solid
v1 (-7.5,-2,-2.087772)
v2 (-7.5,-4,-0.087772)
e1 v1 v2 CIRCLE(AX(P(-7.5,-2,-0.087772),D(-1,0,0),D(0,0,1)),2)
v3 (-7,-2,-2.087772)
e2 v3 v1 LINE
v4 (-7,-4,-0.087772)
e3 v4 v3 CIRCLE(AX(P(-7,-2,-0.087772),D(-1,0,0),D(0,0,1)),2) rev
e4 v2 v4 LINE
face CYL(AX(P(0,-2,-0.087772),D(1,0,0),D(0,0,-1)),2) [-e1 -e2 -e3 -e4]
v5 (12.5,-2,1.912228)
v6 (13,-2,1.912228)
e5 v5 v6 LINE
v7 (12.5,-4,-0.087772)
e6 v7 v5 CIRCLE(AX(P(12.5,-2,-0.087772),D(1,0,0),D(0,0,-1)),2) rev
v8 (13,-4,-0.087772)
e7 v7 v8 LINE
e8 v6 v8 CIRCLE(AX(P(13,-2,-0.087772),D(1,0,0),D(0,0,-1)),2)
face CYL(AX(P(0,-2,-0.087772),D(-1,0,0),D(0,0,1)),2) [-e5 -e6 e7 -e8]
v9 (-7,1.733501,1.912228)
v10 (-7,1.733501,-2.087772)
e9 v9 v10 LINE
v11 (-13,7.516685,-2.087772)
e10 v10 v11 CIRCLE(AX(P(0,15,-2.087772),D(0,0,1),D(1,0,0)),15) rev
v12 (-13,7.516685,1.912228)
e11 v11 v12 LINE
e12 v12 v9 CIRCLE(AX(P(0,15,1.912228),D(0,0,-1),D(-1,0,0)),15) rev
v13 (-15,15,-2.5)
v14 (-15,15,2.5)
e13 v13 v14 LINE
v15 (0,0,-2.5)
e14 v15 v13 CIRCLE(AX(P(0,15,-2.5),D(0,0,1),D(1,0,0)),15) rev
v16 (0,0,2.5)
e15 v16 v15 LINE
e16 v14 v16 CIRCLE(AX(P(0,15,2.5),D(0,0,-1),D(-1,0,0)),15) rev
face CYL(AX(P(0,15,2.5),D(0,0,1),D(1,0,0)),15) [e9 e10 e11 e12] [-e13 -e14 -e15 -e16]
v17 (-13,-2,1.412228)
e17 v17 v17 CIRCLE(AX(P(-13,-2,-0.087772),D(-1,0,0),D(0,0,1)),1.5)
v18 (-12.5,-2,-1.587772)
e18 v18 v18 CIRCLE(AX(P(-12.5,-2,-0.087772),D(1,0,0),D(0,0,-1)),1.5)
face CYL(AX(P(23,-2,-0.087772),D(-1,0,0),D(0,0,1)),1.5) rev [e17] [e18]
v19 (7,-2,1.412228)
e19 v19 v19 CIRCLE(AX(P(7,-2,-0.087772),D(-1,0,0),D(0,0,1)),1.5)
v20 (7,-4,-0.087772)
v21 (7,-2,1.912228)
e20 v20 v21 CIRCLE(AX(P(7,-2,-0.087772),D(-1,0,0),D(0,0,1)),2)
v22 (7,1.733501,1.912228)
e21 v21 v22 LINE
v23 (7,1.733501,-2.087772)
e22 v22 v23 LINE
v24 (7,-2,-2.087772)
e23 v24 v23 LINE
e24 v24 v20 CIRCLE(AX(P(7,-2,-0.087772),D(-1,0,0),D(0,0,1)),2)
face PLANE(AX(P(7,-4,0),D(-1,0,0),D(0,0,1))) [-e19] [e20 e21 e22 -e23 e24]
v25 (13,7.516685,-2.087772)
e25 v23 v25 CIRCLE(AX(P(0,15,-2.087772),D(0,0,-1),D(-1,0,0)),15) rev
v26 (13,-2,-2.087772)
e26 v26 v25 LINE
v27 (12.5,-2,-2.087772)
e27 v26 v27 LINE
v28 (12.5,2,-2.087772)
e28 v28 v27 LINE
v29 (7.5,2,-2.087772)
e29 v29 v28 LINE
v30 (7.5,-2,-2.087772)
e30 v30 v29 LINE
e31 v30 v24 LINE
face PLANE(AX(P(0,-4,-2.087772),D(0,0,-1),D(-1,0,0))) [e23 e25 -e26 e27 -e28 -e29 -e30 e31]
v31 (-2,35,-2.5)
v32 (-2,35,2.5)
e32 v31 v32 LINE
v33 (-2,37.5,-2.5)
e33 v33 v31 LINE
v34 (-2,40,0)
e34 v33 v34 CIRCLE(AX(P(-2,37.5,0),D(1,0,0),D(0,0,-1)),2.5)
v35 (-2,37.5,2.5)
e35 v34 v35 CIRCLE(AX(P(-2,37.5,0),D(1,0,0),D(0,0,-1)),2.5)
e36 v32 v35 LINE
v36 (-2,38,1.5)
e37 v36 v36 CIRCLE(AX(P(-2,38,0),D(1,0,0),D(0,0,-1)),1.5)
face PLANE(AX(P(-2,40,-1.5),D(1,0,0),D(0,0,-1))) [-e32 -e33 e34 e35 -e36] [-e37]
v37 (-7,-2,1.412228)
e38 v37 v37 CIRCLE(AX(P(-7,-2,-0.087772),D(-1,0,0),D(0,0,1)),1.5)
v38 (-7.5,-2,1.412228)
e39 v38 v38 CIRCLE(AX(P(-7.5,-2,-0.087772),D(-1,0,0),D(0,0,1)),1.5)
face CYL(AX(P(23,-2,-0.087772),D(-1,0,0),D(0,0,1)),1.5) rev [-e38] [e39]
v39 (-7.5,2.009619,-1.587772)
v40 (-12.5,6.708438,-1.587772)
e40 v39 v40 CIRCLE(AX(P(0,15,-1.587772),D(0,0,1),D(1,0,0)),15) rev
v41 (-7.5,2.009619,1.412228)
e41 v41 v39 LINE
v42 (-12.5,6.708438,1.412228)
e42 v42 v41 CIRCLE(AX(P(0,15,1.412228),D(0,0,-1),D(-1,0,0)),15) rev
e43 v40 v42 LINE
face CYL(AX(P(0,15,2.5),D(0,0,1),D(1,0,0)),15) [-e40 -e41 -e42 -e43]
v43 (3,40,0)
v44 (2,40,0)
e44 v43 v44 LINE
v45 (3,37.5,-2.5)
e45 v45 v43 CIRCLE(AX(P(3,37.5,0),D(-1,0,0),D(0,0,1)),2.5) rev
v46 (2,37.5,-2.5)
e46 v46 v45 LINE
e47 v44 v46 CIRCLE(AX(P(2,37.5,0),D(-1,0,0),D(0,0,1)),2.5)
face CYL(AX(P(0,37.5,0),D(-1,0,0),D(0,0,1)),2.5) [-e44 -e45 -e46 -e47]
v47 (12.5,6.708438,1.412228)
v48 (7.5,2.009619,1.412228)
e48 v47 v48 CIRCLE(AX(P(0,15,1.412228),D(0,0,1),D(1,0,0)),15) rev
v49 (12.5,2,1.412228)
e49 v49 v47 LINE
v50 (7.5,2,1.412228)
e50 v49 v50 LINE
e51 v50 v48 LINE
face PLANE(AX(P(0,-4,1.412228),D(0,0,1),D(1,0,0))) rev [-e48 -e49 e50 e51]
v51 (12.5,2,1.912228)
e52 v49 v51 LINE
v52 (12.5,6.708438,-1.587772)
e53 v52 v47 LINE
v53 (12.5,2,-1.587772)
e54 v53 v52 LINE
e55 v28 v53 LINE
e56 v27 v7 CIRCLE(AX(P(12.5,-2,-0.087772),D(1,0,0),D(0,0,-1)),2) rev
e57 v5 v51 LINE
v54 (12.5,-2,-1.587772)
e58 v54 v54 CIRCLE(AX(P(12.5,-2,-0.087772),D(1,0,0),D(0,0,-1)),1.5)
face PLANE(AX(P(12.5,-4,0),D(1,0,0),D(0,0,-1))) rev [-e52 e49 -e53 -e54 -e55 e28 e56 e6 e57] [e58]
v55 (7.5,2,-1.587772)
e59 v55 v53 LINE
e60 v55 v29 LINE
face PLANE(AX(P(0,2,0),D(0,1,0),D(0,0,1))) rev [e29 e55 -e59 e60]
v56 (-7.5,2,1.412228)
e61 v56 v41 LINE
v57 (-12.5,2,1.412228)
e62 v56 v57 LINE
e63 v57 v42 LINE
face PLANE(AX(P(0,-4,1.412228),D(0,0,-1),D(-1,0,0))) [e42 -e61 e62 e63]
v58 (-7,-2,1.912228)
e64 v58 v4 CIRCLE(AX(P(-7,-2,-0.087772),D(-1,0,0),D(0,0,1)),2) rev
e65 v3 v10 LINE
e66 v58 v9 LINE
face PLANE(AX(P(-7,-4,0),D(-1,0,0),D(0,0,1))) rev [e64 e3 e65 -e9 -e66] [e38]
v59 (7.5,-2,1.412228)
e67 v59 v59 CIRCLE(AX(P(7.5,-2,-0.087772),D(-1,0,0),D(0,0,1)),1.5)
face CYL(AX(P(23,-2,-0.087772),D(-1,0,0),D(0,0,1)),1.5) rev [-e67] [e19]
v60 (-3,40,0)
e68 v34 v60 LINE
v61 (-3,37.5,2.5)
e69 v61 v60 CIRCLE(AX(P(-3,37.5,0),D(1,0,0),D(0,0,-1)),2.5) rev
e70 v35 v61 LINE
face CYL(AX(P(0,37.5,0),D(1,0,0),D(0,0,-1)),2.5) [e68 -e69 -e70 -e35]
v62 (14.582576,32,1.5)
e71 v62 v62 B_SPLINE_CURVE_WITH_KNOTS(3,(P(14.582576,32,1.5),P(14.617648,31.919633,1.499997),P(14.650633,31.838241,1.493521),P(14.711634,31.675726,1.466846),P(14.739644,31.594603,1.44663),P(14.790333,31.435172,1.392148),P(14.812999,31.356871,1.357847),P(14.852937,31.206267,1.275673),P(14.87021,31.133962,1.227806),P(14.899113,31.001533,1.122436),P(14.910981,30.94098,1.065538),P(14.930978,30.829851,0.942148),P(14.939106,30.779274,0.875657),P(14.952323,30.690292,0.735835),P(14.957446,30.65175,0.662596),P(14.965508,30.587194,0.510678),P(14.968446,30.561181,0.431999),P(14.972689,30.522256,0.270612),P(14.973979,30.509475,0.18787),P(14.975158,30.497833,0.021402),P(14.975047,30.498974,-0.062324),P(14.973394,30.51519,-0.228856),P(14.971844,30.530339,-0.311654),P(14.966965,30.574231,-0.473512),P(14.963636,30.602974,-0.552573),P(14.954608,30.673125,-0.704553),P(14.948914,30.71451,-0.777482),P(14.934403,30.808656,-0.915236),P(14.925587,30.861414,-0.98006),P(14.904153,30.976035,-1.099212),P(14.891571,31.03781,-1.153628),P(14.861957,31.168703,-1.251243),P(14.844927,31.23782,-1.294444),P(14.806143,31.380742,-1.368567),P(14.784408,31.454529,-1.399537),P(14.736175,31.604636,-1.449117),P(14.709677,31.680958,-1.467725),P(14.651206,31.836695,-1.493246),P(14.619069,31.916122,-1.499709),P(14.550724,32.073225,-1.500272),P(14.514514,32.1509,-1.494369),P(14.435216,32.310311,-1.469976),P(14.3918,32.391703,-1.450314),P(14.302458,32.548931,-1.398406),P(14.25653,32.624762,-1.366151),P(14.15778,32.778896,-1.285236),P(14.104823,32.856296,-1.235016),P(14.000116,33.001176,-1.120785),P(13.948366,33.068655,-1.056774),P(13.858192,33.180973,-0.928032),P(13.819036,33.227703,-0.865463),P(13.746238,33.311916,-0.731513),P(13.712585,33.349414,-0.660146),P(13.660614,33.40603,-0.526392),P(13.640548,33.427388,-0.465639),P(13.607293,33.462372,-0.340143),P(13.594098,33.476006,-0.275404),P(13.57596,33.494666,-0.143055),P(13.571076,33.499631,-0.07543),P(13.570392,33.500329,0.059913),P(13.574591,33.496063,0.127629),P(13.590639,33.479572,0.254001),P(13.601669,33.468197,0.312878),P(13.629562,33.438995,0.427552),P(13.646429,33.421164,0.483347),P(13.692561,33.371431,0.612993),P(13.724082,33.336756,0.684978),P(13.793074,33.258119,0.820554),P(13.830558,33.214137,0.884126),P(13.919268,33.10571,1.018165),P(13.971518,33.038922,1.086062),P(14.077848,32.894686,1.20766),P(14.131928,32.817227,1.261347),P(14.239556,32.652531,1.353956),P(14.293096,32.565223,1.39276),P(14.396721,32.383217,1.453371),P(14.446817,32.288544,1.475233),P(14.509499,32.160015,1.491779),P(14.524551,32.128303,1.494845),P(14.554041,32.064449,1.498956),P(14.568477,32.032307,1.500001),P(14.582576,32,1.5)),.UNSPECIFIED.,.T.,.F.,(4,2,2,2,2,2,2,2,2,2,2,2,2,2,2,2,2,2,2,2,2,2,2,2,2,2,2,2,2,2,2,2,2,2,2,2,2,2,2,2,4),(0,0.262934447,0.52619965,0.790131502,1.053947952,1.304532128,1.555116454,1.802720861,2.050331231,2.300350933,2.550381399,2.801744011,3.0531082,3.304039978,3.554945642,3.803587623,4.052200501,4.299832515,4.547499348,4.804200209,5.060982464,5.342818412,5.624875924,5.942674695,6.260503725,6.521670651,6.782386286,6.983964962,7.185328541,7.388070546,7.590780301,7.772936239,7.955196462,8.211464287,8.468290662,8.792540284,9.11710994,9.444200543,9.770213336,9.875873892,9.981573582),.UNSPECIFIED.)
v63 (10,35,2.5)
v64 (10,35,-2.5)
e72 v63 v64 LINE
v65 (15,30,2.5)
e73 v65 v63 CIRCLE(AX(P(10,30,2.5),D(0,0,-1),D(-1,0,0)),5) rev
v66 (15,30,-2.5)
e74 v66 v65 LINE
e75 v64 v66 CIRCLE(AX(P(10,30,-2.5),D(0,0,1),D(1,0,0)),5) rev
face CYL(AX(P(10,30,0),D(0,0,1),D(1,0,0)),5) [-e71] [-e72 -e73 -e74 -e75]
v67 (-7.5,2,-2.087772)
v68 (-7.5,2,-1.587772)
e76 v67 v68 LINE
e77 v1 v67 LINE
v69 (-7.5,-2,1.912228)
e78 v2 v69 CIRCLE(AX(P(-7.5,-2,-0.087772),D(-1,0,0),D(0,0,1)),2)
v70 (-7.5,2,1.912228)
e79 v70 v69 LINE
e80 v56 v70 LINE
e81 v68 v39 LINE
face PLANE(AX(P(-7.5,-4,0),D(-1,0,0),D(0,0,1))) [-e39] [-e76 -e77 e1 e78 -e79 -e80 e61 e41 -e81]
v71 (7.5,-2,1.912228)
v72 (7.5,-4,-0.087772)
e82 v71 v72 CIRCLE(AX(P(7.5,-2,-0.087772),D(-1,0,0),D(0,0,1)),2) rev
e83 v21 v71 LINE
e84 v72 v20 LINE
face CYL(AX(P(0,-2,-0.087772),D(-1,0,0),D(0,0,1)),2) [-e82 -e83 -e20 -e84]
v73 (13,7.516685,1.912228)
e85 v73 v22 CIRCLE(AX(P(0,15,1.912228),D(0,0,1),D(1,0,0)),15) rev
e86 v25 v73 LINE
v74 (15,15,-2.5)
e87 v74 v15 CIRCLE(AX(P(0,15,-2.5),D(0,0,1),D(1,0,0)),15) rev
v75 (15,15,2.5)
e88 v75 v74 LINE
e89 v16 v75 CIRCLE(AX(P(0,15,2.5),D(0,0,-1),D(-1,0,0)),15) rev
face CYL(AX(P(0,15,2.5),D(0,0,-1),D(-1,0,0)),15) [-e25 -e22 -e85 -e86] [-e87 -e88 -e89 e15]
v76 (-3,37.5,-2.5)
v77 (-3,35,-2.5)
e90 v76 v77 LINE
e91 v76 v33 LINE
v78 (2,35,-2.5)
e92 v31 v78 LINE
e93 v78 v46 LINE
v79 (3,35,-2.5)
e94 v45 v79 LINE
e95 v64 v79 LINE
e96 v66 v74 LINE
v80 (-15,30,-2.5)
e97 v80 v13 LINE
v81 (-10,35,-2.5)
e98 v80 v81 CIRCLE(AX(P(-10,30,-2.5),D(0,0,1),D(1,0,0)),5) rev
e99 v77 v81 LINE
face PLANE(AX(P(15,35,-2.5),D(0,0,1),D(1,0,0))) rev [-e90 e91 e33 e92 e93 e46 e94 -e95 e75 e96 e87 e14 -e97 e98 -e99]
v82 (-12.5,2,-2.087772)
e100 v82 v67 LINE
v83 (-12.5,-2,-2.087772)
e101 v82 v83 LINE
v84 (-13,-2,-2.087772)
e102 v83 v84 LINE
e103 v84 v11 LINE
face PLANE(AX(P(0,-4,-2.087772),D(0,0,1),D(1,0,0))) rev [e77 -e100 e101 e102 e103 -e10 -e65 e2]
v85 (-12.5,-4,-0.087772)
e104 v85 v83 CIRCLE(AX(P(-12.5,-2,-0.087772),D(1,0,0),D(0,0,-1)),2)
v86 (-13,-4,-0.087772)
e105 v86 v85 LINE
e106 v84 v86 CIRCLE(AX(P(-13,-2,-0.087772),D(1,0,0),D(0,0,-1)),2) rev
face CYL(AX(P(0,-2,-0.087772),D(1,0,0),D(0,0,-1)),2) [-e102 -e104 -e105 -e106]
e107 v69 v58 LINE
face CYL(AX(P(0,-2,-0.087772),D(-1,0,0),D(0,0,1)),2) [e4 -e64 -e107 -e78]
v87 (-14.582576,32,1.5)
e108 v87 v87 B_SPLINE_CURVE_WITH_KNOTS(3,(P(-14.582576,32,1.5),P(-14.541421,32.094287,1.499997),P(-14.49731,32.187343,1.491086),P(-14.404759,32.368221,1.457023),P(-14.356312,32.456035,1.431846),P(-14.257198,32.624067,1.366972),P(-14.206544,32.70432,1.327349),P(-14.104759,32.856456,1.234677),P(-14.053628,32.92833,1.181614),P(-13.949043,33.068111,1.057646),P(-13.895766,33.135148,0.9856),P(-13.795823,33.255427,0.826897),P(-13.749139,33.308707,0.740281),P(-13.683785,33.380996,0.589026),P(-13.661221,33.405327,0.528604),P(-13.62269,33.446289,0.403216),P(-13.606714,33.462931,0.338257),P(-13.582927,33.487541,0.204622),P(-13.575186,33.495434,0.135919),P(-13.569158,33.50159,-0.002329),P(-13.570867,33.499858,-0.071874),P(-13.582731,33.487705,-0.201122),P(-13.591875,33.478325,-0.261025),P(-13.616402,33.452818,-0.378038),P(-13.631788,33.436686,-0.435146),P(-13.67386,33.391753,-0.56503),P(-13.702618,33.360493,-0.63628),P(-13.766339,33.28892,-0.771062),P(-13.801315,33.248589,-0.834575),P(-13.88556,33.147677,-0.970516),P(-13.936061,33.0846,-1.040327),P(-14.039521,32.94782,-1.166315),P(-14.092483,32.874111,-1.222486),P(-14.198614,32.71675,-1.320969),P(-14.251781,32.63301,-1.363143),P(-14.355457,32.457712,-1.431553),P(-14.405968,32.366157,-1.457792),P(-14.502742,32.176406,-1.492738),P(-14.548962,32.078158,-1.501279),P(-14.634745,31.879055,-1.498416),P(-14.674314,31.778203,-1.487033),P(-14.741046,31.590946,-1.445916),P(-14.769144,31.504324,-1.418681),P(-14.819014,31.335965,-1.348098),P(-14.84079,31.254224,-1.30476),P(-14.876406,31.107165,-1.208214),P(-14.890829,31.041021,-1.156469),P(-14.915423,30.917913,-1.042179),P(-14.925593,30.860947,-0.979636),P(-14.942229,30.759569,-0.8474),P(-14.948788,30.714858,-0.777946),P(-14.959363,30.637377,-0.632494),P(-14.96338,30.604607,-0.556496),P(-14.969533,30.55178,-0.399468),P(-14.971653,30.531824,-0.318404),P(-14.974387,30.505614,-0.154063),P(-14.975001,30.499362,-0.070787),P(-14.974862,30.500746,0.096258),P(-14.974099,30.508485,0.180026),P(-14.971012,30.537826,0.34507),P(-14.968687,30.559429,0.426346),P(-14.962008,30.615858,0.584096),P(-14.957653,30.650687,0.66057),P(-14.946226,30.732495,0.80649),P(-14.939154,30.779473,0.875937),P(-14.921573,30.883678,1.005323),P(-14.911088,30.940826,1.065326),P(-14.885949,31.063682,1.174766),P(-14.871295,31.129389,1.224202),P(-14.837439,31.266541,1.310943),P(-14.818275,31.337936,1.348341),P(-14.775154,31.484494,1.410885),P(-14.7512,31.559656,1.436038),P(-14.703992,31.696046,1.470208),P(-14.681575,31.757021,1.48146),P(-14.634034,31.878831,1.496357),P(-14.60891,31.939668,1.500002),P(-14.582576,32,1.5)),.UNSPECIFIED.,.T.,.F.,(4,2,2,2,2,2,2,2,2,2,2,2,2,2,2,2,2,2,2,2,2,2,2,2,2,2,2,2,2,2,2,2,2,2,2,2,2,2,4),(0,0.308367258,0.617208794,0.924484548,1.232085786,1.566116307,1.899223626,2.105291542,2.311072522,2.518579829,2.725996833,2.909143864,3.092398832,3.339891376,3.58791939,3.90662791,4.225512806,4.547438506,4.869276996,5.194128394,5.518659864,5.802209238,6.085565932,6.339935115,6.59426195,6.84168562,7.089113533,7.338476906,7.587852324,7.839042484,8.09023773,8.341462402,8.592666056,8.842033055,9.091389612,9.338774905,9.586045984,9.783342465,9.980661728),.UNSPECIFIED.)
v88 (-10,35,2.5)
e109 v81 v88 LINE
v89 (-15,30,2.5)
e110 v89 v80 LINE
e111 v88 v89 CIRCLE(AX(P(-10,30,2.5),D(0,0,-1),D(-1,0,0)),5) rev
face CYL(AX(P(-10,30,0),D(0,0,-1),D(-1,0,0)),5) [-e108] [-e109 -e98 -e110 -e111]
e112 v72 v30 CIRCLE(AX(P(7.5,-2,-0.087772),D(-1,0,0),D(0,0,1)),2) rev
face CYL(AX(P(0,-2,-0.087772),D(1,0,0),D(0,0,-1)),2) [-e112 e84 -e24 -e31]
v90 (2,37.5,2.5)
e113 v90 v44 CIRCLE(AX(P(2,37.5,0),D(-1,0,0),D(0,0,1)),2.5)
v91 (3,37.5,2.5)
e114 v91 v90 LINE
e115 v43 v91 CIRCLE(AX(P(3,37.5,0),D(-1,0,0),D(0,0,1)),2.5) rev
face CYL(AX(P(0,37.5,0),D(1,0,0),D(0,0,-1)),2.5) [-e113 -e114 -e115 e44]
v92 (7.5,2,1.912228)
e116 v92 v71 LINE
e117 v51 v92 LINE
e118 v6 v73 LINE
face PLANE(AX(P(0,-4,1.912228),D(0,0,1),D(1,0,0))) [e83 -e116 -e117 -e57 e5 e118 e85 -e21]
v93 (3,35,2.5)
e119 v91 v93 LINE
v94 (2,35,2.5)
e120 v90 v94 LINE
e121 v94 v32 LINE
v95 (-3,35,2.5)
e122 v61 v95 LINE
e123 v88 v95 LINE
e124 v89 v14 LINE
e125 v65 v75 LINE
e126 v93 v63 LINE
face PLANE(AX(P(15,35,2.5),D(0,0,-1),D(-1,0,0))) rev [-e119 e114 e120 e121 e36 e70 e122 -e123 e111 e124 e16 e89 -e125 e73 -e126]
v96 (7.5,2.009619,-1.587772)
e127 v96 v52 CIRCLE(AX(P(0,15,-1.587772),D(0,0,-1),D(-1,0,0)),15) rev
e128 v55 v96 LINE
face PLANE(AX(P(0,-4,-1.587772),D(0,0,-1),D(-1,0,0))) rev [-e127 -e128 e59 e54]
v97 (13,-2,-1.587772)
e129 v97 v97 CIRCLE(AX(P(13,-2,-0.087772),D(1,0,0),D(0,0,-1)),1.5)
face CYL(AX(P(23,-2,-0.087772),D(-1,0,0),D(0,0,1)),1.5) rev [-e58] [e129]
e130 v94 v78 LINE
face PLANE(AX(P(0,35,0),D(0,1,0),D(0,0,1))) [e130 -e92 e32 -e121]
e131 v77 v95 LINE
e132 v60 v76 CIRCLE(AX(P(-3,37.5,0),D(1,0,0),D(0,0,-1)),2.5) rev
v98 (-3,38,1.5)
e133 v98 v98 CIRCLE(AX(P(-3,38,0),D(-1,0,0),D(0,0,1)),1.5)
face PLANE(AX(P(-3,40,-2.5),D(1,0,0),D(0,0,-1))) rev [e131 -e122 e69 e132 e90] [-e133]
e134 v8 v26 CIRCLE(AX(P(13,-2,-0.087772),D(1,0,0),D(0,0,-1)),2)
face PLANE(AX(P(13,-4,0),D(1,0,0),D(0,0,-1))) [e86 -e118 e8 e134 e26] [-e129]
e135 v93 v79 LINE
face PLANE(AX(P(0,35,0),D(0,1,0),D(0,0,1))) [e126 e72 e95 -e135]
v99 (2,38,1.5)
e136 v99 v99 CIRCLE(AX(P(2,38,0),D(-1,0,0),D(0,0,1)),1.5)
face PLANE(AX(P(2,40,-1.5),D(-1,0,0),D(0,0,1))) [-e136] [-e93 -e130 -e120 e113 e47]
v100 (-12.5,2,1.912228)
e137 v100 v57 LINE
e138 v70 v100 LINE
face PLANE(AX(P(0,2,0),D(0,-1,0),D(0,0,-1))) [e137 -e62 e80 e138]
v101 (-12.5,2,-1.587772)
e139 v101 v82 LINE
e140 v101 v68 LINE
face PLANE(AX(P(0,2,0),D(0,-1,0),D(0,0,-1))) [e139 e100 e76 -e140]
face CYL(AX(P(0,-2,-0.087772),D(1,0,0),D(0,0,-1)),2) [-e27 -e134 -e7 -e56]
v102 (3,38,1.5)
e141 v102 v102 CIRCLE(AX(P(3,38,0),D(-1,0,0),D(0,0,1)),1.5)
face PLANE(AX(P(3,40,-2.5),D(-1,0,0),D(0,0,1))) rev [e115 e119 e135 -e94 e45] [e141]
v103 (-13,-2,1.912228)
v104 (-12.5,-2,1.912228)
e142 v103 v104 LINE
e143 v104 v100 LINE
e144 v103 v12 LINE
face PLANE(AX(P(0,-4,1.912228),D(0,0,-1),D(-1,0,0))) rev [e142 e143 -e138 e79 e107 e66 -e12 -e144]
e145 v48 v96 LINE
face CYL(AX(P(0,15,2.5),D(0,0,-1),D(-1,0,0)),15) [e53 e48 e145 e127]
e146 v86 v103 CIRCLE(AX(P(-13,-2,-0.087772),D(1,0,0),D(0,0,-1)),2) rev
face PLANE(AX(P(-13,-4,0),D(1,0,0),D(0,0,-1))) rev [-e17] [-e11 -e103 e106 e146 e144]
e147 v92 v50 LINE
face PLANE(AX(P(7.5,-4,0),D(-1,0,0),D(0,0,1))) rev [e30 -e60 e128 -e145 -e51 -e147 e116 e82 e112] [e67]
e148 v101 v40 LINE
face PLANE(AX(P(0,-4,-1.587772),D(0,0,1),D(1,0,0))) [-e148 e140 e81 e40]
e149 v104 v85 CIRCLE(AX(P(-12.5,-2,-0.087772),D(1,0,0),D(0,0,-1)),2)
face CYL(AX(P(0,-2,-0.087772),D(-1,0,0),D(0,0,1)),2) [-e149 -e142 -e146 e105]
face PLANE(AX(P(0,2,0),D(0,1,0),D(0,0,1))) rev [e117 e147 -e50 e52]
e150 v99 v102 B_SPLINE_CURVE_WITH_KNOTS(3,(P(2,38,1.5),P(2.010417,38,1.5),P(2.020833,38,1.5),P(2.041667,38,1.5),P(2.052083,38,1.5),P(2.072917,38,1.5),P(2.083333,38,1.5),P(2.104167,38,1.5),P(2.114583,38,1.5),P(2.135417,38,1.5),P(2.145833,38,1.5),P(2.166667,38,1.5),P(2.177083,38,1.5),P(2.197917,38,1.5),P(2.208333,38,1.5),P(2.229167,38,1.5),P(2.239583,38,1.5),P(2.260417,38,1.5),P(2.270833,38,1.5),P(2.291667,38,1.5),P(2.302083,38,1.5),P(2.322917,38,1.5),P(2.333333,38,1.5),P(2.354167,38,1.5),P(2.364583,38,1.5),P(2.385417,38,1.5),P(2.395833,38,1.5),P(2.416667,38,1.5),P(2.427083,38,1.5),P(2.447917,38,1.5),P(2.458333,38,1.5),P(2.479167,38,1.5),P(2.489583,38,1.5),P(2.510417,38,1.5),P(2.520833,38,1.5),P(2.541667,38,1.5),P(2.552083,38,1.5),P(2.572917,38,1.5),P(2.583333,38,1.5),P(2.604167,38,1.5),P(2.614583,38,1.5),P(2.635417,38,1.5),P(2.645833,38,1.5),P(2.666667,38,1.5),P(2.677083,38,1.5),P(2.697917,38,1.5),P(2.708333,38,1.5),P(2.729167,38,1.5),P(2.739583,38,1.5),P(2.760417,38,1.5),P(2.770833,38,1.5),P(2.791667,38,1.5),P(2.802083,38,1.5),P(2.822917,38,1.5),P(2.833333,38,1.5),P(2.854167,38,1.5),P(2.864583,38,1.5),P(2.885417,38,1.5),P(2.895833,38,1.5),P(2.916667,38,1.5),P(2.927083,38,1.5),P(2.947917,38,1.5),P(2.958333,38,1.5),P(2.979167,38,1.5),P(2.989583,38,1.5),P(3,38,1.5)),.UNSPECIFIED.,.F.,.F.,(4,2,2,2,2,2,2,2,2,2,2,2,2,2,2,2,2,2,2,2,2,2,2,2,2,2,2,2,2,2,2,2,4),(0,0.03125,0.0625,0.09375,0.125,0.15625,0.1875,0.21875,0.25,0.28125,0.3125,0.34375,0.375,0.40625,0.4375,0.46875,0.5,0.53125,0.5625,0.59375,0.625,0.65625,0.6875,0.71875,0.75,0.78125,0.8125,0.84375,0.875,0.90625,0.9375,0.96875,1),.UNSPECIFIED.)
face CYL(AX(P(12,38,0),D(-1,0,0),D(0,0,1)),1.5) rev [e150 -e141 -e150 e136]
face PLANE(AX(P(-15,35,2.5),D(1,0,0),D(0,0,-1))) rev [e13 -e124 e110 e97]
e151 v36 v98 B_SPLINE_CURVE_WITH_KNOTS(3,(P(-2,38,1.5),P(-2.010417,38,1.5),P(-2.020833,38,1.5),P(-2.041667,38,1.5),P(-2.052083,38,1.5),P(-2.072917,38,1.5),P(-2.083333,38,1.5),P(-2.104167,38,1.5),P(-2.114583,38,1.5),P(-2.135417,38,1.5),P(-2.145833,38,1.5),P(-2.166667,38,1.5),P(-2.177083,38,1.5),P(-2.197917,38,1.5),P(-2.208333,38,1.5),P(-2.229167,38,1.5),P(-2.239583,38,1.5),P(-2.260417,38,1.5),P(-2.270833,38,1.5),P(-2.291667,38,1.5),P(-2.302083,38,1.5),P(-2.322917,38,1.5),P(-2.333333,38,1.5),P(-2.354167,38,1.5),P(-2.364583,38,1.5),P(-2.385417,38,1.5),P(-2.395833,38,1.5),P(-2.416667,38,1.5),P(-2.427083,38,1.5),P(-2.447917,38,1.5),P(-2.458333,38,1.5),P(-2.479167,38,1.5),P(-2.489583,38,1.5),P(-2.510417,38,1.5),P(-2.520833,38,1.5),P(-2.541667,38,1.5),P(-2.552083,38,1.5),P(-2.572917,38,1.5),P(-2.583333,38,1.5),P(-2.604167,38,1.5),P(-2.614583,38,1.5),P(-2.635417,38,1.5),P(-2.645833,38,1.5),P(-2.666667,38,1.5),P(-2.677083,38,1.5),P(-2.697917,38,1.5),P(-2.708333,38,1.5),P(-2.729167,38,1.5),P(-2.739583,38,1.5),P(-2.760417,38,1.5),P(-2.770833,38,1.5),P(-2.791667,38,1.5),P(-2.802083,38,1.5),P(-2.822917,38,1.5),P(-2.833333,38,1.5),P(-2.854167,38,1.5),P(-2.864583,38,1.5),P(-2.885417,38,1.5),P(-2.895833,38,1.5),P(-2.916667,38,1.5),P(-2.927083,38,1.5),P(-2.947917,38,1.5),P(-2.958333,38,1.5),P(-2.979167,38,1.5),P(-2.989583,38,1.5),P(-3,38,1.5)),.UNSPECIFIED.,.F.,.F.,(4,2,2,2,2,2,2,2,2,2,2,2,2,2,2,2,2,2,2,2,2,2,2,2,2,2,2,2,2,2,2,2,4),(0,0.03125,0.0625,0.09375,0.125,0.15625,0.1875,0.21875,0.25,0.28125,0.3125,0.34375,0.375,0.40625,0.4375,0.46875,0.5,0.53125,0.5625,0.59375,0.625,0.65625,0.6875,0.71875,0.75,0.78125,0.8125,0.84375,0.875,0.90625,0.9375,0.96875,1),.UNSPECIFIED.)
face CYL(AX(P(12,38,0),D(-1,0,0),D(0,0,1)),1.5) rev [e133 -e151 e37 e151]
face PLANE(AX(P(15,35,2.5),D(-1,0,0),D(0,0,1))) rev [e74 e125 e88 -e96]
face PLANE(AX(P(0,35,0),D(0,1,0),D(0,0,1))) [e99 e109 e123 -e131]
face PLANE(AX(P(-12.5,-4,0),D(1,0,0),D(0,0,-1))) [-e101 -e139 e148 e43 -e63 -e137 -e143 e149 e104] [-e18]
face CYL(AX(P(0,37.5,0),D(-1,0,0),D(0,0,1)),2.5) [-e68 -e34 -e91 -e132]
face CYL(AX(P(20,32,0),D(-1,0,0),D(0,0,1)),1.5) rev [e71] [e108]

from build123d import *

# Parameters (mm, degrees)
SKETCH1_W                = 30
SKETCH1_H                = 5
BOSS_EXTRUDE1_DEPTH      = 35
FILLET1_R                = 15
FILLET3_R                = 5
SKETCH4_R                = 1.5
CUT_EXTRUDE1_DEPTH       = 35
SKETCH5_W                = 6
SKETCH5_H                = 5
SKETCH5_W_2              = 4
SKETCH5_H_2              = 3
BOSS_EXTRUDE2_DEPTH      = 5
CUT_EXTRUDE2_DEPTH       = 5
SKETCH7_R                = 1.5
CUT_EXTRUDE3_DEPTH       = 15
FILLET4_R                = 2.5
BOSS_EXTRUDE3_DEPTH      = 8
BOSS_EXTRUDE3_DEPTH_BACK = 4
SKETCH8_W                = 6
SKETCH8_H                = 4
SKETCH8_W_2              = 5
SKETCH8_H_2              = 3
SKETCH9_W                = 5
SKETCH9_H                = 4.517478875
CUT_EXTRUDE4_DEPTH       = 6
SKETCH10_R               = 1.5
CUT_EXTRUDE5_DEPTH       = 36
FILLET5_R                = 2
FILLET6_R                = 2


with BuildPart() as part:
    # Sketch1 → Boss-Extrude1 (new body)
    with BuildSketch(Plane(origin=(0, 0, 0), x_dir=(1, 0, 0), z_dir=(0, 1, 0))):
        Rectangle(SKETCH1_W, SKETCH1_H)
    extrude(amount=BOSS_EXTRUDE1_DEPTH)

    # Fillet1
    fillet1_edges = [part.edges().sort_by_distance(p)[0] for p in [
        (15, 0, 0),
        (-15, 0, 0),
    ]]
    fillet(fillet1_edges, radius=FILLET1_R - 0.0001)  # a hair under: the kernel refuses the full size

    # Fillet3
    fillet3_edges = [part.edges().sort_by_distance(p)[0] for p in [
        (15, 35, 0),
        (-15, 35, 0),
    ]]
    fillet(fillet3_edges, radius=FILLET3_R)

    # Sketch4 → Cut-Extrude1 (cut)
    with BuildSketch(Plane.ZY.offset(15)):
        with Locations((0, 32)):
            Circle(SKETCH4_R)
    extrude(amount=-CUT_EXTRUDE1_DEPTH, mode=Mode.SUBTRACT)

    # Sketch5 → Boss-Extrude2 (add)
    with BuildSketch(Plane(origin=(0, 35, 0), x_dir=(1, 0, 0), z_dir=(0, 1, 0))):
        Rectangle(SKETCH5_W, SKETCH5_H)
        Rectangle(SKETCH5_W_2, SKETCH5_H_2, mode=Mode.SUBTRACT)
    extrude(amount=BOSS_EXTRUDE2_DEPTH)

    # Sketch6 → Cut-Extrude2 (cut)
    with BuildSketch(Plane(origin=(0, 40, 0), x_dir=(1, 0, 0), z_dir=(0, 1, 0))):
        Polygon((-2, 1.5), (-2, 3.860545562), (2, 3.860545562), (2, -3.417925007), (-2, -3.417925007), align=None)
    extrude(amount=-CUT_EXTRUDE2_DEPTH, mode=Mode.SUBTRACT)

    # Sketch7 → Cut-Extrude3 (cut)
    with BuildSketch(Plane.ZY.offset(3)):
        with Locations((0, 38)):
            Circle(SKETCH7_R)
    extrude(amount=-CUT_EXTRUDE3_DEPTH, mode=Mode.SUBTRACT)

    # Fillet4
    fillet4_edges = [part.edges().sort_by_distance(p)[0] for p in [
        (-2.5, 40, 2.5),
        (-2.5, 40, -2.5),
        (2.5, 40, 2.5),
        (2.5, 40, -2.5),
    ]]
    fillet(fillet4_edges, radius=FILLET4_R - 0.0001)  # a hair under: the kernel refuses the full size

    # Sketch8 → Boss-Extrude3 (add, two sides: drawn at the far end of the back side and taken through both)
    # profile 1 of 2: a face of its own
    with BuildSketch(Plane(origin=(0, 0, 0), x_dir=(1, 0, 0), z_dir=(0, 1, 0)).offset(-BOSS_EXTRUDE3_DEPTH_BACK)):
        with Locations((-10, 0.087771821)):
            Rectangle(SKETCH8_W, SKETCH8_H)
        with Locations((-10, 0.087771821)):
            Rectangle(SKETCH8_W_2, SKETCH8_H_2, mode=Mode.SUBTRACT)
    # profile 2 of 2: a face of its own
    with BuildSketch(Plane(origin=(0, 0, 0), x_dir=(1, 0, 0), z_dir=(0, 1, 0)).offset(-BOSS_EXTRUDE3_DEPTH_BACK)):
        with Locations((10, 0.087771821)):
            Rectangle(SKETCH8_W, SKETCH8_H)
        with Locations((10, 0.087771821)):
            Rectangle(SKETCH8_W_2, SKETCH8_H_2, mode=Mode.SUBTRACT)
    extrude(amount=BOSS_EXTRUDE3_DEPTH + BOSS_EXTRUDE3_DEPTH_BACK)

    # Sketch9 → Cut-Extrude4 (cut)
    with BuildSketch(Plane.XZ.offset(4)):
        with Locations((-10, -0.111234663)):
            Rectangle(SKETCH9_W, SKETCH9_H)
        with Locations((10, -0.111234663)):
            Rectangle(SKETCH9_W, SKETCH9_H)
    extrude(amount=-CUT_EXTRUDE4_DEPTH, mode=Mode.SUBTRACT)

    # Sketch10 → Cut-Extrude5 (cut)
    with BuildSketch(Plane.ZY.offset(13)):
        with Locations(Location((-0.087771821, -2, 0), (0, 0, 180))):
            Circle(SKETCH10_R)
    extrude(amount=-CUT_EXTRUDE5_DEPTH, mode=Mode.SUBTRACT)

    # Fillet5
    fillet5_edges = [part.edges().sort_by_distance(p)[0] for p in [
        (7.25, -4, -2.087771821),
        (7.25, -4, 1.912228179),
        (12.75, -4, 1.912228179),
        (12.75, -4, -2.087771821),
    ]]
    fillet(fillet5_edges, radius=FILLET5_R - 0.0001)  # a hair under: the kernel refuses the full size

    # Fillet6
    fillet6_edges = [part.edges().sort_by_distance(p)[0] for p in [
        (-7.25, -4, 1.912228179),
        (-12.75, -4, 1.912228179),
        (-12.75, -4, -2.087771821),
        (-7.25, -4, -2.087771821),
    ]]
    fillet(fillet6_edges, radius=FILLET6_R - 0.0001)  # a hair under: the kernel refuses the full size


solid = part.part
